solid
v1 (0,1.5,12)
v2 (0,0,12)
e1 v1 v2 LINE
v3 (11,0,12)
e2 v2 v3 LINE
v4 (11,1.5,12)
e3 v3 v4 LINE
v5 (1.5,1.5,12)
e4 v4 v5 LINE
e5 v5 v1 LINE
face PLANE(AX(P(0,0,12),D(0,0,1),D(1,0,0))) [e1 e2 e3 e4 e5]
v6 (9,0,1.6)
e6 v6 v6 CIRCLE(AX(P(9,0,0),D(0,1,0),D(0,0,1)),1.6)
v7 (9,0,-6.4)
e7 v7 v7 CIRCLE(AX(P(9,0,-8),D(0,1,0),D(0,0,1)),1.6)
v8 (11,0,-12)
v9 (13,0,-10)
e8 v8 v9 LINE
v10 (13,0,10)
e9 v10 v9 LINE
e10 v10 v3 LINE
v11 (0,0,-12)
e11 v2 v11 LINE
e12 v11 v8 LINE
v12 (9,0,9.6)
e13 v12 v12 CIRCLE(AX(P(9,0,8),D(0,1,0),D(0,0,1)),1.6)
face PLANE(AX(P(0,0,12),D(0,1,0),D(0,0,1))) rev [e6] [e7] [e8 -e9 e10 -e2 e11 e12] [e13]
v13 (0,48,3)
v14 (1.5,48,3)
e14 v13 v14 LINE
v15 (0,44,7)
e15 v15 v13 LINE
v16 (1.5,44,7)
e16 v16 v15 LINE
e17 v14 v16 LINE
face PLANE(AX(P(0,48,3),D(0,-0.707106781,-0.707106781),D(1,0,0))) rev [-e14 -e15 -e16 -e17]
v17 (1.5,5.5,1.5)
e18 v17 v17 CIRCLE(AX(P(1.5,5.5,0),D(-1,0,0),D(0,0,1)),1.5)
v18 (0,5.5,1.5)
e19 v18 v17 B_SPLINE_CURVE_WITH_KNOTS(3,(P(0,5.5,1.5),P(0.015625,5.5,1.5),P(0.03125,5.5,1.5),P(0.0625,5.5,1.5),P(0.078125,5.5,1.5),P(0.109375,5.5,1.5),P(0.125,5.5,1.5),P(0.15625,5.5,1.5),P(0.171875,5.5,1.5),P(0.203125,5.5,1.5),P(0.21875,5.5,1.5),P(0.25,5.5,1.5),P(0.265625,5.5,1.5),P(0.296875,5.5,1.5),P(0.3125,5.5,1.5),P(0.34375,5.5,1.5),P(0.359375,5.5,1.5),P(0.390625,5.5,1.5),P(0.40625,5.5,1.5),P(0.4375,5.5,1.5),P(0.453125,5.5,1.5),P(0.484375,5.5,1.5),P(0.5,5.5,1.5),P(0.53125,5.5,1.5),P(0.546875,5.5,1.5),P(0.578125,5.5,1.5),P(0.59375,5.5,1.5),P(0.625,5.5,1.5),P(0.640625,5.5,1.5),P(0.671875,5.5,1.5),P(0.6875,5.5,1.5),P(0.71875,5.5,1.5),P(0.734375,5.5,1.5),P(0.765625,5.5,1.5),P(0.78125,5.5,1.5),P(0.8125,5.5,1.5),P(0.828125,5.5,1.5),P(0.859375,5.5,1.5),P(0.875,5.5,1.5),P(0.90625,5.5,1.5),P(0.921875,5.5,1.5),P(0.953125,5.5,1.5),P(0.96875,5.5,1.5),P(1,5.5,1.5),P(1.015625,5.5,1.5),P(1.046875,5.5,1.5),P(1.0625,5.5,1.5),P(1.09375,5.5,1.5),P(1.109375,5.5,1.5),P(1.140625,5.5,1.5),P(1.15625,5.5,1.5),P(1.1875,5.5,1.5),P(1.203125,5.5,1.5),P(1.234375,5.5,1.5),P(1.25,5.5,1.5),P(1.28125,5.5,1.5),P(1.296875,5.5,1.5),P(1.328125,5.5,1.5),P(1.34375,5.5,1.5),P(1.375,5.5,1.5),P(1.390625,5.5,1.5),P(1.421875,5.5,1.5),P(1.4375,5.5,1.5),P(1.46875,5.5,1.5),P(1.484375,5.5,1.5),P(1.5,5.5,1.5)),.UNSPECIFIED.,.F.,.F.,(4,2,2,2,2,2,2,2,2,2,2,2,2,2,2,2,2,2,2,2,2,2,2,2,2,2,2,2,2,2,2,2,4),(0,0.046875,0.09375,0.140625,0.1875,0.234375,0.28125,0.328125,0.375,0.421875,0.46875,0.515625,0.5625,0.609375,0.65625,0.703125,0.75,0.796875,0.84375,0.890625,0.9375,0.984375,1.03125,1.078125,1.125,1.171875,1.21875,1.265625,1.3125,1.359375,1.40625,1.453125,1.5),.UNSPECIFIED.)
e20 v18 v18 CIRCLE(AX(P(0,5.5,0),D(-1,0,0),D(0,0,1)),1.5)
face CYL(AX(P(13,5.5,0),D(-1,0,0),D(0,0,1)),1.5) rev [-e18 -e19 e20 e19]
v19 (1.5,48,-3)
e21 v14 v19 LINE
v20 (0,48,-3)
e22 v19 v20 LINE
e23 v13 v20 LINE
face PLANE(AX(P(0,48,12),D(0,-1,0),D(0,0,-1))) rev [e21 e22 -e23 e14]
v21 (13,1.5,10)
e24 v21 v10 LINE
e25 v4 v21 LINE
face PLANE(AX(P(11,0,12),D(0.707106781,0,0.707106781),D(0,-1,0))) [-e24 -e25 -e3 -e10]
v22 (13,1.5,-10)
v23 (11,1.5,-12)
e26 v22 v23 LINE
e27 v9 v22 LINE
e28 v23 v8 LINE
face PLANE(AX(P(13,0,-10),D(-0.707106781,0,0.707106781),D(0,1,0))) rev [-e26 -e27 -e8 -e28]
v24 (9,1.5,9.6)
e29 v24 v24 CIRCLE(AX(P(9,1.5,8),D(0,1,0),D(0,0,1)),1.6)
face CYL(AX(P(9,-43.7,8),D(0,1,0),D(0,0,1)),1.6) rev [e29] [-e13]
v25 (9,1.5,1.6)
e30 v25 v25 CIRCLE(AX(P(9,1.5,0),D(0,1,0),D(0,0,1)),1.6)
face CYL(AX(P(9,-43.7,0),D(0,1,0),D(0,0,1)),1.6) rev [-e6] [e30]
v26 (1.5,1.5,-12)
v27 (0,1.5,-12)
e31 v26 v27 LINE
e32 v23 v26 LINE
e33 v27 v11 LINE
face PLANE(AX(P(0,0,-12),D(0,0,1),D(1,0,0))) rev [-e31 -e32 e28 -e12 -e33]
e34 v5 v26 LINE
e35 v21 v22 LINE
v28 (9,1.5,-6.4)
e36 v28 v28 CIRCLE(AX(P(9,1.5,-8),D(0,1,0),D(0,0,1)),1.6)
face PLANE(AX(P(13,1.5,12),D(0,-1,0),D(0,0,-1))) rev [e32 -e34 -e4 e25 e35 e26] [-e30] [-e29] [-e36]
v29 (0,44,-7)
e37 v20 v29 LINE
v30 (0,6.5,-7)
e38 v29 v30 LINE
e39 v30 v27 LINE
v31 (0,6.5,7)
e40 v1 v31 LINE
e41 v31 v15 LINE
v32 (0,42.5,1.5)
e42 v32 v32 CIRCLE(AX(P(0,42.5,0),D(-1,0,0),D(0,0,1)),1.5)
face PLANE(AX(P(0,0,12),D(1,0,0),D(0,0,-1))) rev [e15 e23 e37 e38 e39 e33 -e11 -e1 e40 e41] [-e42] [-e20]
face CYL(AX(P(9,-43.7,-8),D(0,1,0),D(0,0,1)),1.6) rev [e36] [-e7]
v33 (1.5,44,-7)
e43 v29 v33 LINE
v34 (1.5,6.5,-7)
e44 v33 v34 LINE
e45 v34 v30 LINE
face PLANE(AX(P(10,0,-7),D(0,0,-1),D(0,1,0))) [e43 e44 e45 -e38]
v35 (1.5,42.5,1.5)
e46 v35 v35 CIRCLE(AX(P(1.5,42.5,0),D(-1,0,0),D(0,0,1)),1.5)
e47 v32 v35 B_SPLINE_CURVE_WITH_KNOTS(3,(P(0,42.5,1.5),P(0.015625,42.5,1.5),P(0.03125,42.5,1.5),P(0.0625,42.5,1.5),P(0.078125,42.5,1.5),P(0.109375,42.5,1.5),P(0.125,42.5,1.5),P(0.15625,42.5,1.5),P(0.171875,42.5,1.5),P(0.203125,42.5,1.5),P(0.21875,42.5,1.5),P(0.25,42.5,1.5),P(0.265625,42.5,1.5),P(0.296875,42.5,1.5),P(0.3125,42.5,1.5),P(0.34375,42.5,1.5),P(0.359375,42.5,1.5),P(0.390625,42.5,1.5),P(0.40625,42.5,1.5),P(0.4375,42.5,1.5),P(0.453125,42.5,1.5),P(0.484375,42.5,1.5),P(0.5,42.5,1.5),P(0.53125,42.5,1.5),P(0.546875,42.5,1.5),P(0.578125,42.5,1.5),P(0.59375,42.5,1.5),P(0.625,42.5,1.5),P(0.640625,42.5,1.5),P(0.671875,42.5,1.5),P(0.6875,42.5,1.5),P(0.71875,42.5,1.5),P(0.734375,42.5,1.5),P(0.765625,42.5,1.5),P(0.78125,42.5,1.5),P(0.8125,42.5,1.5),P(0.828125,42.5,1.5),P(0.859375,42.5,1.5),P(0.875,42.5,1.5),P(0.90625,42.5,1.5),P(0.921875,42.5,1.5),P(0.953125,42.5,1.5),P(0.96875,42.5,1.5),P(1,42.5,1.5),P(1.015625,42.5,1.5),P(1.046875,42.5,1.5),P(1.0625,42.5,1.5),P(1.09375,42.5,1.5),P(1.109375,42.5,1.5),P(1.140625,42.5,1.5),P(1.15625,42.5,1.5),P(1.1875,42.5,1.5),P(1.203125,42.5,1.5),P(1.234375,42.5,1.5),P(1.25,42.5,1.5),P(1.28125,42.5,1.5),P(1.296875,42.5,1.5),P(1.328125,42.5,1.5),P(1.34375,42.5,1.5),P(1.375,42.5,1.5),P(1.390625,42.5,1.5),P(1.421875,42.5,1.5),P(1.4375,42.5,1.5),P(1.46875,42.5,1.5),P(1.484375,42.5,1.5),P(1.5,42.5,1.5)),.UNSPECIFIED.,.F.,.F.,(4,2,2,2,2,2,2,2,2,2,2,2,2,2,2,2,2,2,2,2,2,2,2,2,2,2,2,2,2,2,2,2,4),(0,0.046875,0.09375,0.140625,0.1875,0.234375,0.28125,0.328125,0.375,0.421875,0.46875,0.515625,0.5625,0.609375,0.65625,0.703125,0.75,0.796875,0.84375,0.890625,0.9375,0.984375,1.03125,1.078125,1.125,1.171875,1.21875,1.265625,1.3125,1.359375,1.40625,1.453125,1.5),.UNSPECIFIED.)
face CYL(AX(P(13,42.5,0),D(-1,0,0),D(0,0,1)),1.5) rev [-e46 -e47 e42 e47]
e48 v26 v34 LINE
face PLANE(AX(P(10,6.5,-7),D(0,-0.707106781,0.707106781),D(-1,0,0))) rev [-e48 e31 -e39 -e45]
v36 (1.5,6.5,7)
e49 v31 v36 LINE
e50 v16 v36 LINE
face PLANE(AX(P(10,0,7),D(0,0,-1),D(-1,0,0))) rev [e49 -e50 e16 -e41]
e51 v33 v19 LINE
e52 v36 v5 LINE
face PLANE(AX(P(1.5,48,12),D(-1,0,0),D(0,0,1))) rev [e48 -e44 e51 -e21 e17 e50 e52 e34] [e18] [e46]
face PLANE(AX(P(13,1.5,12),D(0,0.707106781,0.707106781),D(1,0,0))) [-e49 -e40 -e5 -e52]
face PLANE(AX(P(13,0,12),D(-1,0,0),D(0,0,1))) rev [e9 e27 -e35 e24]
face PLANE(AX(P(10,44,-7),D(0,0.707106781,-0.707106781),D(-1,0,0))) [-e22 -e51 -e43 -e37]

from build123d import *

# Parameters (mm, degrees)
EXTRUDE_1_DEPTH     = 12
SKETCH_2_R          = 1.6
CUT_EXTRUDE_1_DEPTH = 45.2
CHAMFER_1_SIZE      = 2
SKETCH_4_R          = 1.5
CUT_EXTRUDE_2_DEPTH = 52.15662225
SKETCH_6_W          = 26.1795091
SKETCH_6_H          = 41
CUT_EXTRUDE_3_DEPTH = 10
CHAMFER_2_SIZE      = 4
CHAMFER_4_SIZE      = 5


with BuildPart() as part:
    # Эскиз1 → Бобышка-Вытянуть1 (new, symmetric)
    with BuildSketch(Plane.XY):
        Polygon((0, 0), (0, 48), (1.5, 48), (1.5, 1.5), (13, 1.5), (13, 0), align=None)
    extrude(amount=EXTRUDE_1_DEPTH, both=True)

    # Эскиз2 → Вырез-Вытянуть1 (cut)
    with BuildSketch(Plane(origin=(0, 1.5, 0), x_dir=(1, 0, 0), z_dir=(0, 1, 0))):
        with Locations(Location((9, 0, 0), (0, 0, 270))):
            Circle(SKETCH_2_R)
        with Locations(Location((9, -8, 0), (0, 0, 270))):
            Circle(SKETCH_2_R)
        with Locations(Location((9, 8, 0), (0, 0, 270))):
            Circle(SKETCH_2_R)
    extrude(amount=-CUT_EXTRUDE_1_DEPTH, mode=Mode.SUBTRACT)

    # Фаска1
    chamfer_1_edges = [part.edges().sort_by_distance(p)[0] for p in [
        (13, 0.75, 12),
        (13, 0.75, -12),
    ]]
    chamfer(chamfer_1_edges, length=CHAMFER_1_SIZE)

    # Эскиз4 → Вырез-Вытянуть2 (cut, through all)
    with BuildSketch(Plane.ZY):
        with Locations((0, 42.5)):
            Circle(SKETCH_4_R)
        with Locations((0, 5.5)):
            Circle(SKETCH_4_R)
    extrude(amount=-CUT_EXTRUDE_2_DEPTH, mode=Mode.SUBTRACT)

    # Эскиз6 → Вырез-Вытянуть3 (cut)
    with BuildSketch(Plane.ZY):
        Polygon((7, 72.5), (7, 42.5), (33.1795091, 42.5), (33.38840833, 42.5), (33.38840833, 72.5), align=None)
        with Locations((20.08975455, 22)):
            Rectangle(SKETCH_6_W, SKETCH_6_H)
        with Locations((-20.08975455, 22)):
            Rectangle(SKETCH_6_W, SKETCH_6_H)
        Polygon((-33.38840833, 42.5), (-33.1795091, 42.5), (-7, 42.5), (-7, 72.5), (-33.38840833, 72.5), align=None)
    extrude(amount=-CUT_EXTRUDE_3_DEPTH, mode=Mode.SUBTRACT)

    # Фаска2
    chamfer_2_edges = [part.edges().sort_by_distance(p)[0] for p in [
        (0.75, 48, -7),
        (0.75, 48, 7),
    ]]
    chamfer(chamfer_2_edges, length=CHAMFER_2_SIZE)

    # Фаска4
    chamfer_4_edges = [part.edges().sort_by_distance(p)[0] for p in [
        (0.75, 1.5, 7),
        (0.75, 1.5, -7),
    ]]
    chamfer(chamfer_4_edges, length=CHAMFER_4_SIZE - 0.0001)  # a hair under: the kernel refuses the full size


solid = part.part
